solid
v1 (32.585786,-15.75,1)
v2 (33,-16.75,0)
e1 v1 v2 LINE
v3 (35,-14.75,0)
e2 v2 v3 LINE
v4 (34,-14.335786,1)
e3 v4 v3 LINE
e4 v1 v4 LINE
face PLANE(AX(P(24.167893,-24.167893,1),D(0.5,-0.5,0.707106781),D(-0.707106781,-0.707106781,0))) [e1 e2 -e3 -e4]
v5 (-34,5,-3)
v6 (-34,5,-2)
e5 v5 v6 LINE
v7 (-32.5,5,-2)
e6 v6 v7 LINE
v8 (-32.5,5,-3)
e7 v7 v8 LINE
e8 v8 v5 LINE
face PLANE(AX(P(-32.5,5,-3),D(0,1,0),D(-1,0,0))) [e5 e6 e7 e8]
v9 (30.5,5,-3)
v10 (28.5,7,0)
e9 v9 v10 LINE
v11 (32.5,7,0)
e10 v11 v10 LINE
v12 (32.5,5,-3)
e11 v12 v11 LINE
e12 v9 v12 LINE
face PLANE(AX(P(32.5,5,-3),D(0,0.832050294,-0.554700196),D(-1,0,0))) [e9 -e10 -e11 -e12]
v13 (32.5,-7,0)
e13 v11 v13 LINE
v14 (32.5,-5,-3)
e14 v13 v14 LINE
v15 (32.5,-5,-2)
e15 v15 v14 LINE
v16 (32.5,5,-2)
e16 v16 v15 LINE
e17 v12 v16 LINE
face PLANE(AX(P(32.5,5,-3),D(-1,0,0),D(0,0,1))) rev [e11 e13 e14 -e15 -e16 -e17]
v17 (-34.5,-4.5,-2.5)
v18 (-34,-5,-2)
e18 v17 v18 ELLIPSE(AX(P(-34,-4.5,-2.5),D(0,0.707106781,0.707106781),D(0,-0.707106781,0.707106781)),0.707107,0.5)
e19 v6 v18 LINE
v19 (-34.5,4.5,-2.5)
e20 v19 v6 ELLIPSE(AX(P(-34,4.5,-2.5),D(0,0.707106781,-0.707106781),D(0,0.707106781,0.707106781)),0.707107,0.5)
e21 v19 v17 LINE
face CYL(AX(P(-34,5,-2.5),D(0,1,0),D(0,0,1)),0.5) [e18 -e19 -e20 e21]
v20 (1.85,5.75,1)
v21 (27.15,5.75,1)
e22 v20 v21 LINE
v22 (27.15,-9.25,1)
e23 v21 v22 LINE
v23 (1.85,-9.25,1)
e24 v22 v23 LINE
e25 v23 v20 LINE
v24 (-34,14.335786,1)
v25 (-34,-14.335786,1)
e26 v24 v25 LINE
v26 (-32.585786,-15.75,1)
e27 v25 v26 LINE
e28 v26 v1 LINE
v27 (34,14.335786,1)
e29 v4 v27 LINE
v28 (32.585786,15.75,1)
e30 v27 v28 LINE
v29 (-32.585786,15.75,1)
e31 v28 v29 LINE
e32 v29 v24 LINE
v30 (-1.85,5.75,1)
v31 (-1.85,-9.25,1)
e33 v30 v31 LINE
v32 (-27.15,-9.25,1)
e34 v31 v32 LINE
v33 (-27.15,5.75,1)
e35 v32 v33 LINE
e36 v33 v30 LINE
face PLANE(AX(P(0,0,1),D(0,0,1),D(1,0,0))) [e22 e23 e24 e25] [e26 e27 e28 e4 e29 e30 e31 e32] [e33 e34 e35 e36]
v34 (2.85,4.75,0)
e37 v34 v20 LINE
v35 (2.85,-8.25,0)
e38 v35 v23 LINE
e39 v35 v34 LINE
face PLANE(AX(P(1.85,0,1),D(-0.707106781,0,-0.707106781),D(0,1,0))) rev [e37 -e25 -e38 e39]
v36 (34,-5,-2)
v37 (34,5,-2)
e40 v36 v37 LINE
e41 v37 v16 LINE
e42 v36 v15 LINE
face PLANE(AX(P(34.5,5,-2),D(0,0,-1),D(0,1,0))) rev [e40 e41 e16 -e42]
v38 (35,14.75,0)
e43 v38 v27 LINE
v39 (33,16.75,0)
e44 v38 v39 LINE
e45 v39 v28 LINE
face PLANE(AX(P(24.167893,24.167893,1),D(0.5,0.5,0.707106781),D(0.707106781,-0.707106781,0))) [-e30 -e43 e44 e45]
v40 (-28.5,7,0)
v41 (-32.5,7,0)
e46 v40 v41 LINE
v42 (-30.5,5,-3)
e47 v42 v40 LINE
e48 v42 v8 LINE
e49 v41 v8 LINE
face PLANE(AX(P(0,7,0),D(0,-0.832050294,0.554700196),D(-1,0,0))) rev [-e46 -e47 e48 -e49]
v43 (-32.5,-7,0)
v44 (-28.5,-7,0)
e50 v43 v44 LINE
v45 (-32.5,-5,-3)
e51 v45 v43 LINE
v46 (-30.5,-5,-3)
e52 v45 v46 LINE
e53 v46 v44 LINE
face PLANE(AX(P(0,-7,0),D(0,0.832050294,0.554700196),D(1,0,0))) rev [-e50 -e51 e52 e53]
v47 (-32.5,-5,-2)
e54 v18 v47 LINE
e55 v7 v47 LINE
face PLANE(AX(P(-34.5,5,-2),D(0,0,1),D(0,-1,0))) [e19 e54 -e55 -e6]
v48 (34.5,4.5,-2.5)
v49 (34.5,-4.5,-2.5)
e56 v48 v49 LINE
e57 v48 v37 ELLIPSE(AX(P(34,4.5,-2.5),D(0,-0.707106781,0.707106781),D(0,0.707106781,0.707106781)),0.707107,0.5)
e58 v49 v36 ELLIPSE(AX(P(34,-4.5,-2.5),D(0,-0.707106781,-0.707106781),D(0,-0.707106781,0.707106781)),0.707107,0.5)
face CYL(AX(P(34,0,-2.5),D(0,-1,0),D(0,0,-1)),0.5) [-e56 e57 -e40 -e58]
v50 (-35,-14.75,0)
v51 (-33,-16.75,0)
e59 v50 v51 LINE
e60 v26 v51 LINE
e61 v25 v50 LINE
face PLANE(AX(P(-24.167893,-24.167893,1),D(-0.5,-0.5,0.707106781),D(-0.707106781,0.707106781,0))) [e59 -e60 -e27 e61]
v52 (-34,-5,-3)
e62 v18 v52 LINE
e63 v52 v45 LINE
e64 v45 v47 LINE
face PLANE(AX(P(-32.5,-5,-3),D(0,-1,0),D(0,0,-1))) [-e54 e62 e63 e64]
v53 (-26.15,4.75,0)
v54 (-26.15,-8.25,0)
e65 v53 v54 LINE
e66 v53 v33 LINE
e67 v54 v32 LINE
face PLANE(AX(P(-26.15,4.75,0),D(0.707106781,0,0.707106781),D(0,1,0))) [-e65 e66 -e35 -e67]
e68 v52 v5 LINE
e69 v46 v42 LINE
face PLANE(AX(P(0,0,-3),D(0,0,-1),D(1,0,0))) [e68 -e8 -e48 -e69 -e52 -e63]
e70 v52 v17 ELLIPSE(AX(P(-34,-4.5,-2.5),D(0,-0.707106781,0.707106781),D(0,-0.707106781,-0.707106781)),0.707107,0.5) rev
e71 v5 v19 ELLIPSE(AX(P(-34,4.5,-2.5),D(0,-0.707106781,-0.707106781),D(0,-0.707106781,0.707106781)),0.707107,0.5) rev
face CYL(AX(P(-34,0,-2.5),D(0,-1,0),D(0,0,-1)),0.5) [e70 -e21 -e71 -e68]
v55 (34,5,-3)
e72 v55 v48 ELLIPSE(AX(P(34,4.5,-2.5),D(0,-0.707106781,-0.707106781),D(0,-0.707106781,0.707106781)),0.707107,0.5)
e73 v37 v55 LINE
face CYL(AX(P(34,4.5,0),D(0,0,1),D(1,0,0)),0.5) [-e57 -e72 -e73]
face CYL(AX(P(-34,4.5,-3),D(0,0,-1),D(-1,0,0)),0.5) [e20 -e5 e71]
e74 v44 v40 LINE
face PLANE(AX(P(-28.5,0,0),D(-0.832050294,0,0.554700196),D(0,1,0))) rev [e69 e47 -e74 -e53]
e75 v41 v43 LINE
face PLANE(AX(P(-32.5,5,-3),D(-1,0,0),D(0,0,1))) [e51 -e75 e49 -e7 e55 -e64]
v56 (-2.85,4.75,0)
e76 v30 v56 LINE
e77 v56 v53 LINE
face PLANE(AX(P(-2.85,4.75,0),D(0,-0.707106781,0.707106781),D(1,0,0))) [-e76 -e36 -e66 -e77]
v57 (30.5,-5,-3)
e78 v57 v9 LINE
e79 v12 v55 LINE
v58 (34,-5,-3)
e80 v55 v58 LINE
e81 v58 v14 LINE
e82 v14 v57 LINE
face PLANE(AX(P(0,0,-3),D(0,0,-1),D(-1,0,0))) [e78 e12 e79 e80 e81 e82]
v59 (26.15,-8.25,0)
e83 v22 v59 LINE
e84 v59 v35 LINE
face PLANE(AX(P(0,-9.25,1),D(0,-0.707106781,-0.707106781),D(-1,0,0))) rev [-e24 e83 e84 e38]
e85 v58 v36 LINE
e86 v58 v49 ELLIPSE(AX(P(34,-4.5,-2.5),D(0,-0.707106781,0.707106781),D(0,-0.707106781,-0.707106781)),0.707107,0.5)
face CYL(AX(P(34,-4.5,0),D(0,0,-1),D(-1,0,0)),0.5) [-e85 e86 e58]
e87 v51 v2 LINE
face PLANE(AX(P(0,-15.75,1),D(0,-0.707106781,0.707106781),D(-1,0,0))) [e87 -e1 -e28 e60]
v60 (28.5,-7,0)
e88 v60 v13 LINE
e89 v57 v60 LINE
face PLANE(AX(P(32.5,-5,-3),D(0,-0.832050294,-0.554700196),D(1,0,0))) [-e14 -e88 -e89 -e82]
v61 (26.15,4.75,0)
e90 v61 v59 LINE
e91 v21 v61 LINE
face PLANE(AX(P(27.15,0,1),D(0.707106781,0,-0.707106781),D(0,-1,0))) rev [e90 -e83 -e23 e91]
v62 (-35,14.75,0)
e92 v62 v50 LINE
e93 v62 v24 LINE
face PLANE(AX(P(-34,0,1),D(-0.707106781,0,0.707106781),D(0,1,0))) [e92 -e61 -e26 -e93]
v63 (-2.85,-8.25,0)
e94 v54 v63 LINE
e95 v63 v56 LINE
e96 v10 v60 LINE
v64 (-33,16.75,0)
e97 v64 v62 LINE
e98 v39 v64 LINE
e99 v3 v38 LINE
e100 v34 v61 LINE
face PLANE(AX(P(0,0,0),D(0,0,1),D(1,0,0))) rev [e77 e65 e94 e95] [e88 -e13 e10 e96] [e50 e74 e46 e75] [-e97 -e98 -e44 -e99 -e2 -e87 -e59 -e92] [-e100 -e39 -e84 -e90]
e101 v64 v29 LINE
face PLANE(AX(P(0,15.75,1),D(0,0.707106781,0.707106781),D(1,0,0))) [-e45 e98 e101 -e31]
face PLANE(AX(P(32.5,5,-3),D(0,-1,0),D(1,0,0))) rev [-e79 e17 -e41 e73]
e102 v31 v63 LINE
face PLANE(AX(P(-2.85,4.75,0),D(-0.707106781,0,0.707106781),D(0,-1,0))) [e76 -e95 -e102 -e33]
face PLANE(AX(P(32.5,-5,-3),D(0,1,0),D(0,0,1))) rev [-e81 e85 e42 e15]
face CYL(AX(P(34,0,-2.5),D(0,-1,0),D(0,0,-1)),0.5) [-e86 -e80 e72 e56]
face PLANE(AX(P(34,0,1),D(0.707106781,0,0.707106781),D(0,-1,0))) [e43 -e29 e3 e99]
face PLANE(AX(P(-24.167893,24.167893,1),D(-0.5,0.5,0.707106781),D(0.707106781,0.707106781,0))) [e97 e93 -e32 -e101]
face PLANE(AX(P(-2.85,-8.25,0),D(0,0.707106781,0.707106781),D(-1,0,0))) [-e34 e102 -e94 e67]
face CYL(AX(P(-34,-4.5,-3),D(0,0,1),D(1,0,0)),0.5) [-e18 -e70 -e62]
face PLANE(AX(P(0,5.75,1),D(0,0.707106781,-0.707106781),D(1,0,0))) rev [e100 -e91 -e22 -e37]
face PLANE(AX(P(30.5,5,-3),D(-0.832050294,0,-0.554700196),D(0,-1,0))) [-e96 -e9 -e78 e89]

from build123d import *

# Parameters (mm, degrees)
BOSS_EXTRUDE1_DEPTH      = 1
SKETCH2_W                = 23.3
SKETCH2_H                = 13
CUT_EXTRUDE1_DEPTH       = 3
CHAMFER1_SIZE            = 1
CHAMFER1_OF_MIRROR1_SIZE = 1
CHAMFER2_SIZE            = 1
SKETCH3_W                = 2
SKETCH3_H                = 10
BOSS_EXTRUDE2_DEPTH      = 3
SKETCH4_W                = 1
SKETCH4_H                = 10
BOSS_EXTRUDE3_DEPTH      = 2
FILLET1_R                = 0.5
FILLET1_OF_MIRROR2_R     = 0.5


with BuildPart() as part:
    # Sketch1 → Boss-Extrude1 (new body)
    with BuildSketch(Plane.XY):
        Polygon((-35, 14.75), (-35, -14.75), (-33, -16.75), (33, -16.75), (35, -14.75), (35, 14.75), (33, 16.75), (-33, 16.75), align=None)
    extrude(amount=BOSS_EXTRUDE1_DEPTH)

    # Sketch2 → Cut-Extrude1 (cut)
    with BuildSketch(Plane.XY.offset(1)):
        with Locations((-14.5, -1.75)):
            Rectangle(SKETCH2_W, SKETCH2_H)
    cut_extrude1 = extrude(amount=-CUT_EXTRUDE1_DEPTH, mode=Mode.SUBTRACT)

    # Chamfer1
    chamfer1_edges = [part.edges().sort_by_distance(p)[0] for p in [
        (-14.5, -8.25, 1),
        (-2.85, -1.75, 1),
        (-14.5, 4.75, 1),
        (-26.15, -1.75, 1),
    ]]
    chamfer(chamfer1_edges, length=CHAMFER1_SIZE - 0.0001)  # a hair under: the kernel refuses the full size

    # Mirror1: Cut-Extrude1 across plane
    add(cut_extrude1.mirror(Plane(origin=(0, 0, 0), x_dir=(0, 0, 1), z_dir=(1, 0, 0))), mode=Mode.SUBTRACT)

    # Chamfer1 of Mirror1
    chamfer1_of_mirror1_edges = [part.edges().sort_by_distance(p)[0] for p in [
        (14.5, -8.25, 1),
        (2.85, -1.75, 1),
        (14.5, 4.75, 1),
        (26.15, -1.75, 1),
    ]]
    chamfer(chamfer1_of_mirror1_edges, length=CHAMFER1_OF_MIRROR1_SIZE - 0.0001)  # a hair under: the kernel refuses the full size

    # Chamfer2
    chamfer2_edges = [part.edges().sort_by_distance(p)[0] for p in [
        (35, 0, 1),
        (34, 15.75, 1),
        (0, 16.75, 1),
        (-34, 15.75, 1),
        (-35, 0, 1),
        (34, -15.75, 1),
        (0, -16.75, 1),
        (-34, -15.75, 1),
    ]]
    chamfer(chamfer2_edges, length=CHAMFER2_SIZE - 0.0001)  # a hair under: the kernel refuses the full size

    # Sketch3 → Boss-Extrude2 (add)
    with BuildSketch(Plane(origin=(0, 0, 0), x_dir=(-1, 0, 0), z_dir=(0, 0, -1))):
        with Locations((-31.5, 0)):
            Rectangle(SKETCH3_W, SKETCH3_H)
    boss_extrude2 = extrude(amount=BOSS_EXTRUDE2_DEPTH)

    # Sketch4 → Boss-Extrude3 (add)
    with BuildSketch(Plane(origin=(32.5, 0, 0), x_dir=(0, 0, -1), z_dir=(1, 0, 0))):
        with Locations((2.5, 0)):
            Rectangle(SKETCH4_W, SKETCH4_H)
    boss_extrude3 = extrude(amount=BOSS_EXTRUDE3_DEPTH)

    # Fillet1
    fillet1_edges = [part.edges().sort_by_distance(p)[0] for p in [
        (34.5, 0, -3),
        (34.5, 5, -2.5),
        (34.5, 0, -2),
        (34.5, -5, -2.5),
    ]]
    fillet(fillet1_edges, radius=FILLET1_R - 0.0001)  # a hair under: the kernel refuses the full size

    # Mirror2: Boss-Extrude2, Boss-Extrude3 across plane
    add(boss_extrude2.mirror(Plane(origin=(0, 0, 0), x_dir=(0, 0, 1), z_dir=(1, 0, 0))))
    add(boss_extrude3.mirror(Plane(origin=(0, 0, 0), x_dir=(0, 0, 1), z_dir=(1, 0, 0))))

    # Fillet1 of Mirror2
    fillet1_of_mirror2_edges = [part.edges().sort_by_distance(p)[0] for p in [
        (-34.5, 0, -3),
        (-34.5, 5, -2.5),
        (-34.5, 0, -2),
        (-34.5, -5, -2.5),
    ]]
    fillet(fillet1_of_mirror2_edges, radius=FILLET1_OF_MIRROR2_R - 0.0001)  # a hair under: the kernel refuses the full size

    # Chamfer3: read off the stored shape, not the designer's step
    # Chamfer3: loft between two sections, ruled curve by curve
    chamfer3_from = [
        Edge.make_line((32.5, -5, -3), (30.5, -5, -3)),
        Edge.make_line((30.5, -5, -3), (30.5, 5, -3)),
        Edge.make_line((30.5, 5, -3), (32.5, 5, -3)),
        Edge.make_line((32.5, 5, -3), (32.5, -5, -3)),
    ]
    chamfer3_to = [
        Edge.make_line((32.5, -7, 0), (28.5, -7, 0)),
        Edge.make_line((28.5, -7, 0), (28.5, 7, 0)),
        Edge.make_line((28.5, 7, 0), (32.5, 7, 0)),
        Edge.make_line((32.5, 7, 0), (32.5, -7, 0)),
    ]
    chamfer3 = Solid(Shell([*[Face.make_surface_from_curves(chamfer3_from[k], chamfer3_to[k]) for k in range(4)], Face(Wire(chamfer3_from)), Face(Wire(chamfer3_to))]))
    add(chamfer3)

    # Chamfer4: read off the stored shape, not the designer's step
    # Chamfer4: loft between two sections, ruled curve by curve
    chamfer4_from = [
        Edge.make_line((-32.5, -5, -3), (-30.5, -5, -3)),
        Edge.make_line((-32.5, 5, -3), (-30.5, 5, -3)),
        Edge.make_line((-30.5, 5, -3), (-30.5, -5, -3)),
        Edge.make_line((-32.5, 5, -3), (-32.5, -5, -3)),
    ]
    chamfer4_to = [
        Edge.make_line((-32.5, -7, 0), (-28.5, -7, 0)),
        Edge.make_line((-32.5, 7, 0), (-28.5, 7, 0)),
        Edge.make_line((-28.5, 7, 0), (-28.5, -7, 0)),
        Edge.make_line((-32.5, 7, 0), (-32.5, -7, 0)),
    ]
    chamfer4 = Solid(Shell([*[Face.make_surface_from_curves(chamfer4_from[k], chamfer4_to[k]) for k in range(4)], Face(Wire(chamfer4_from)), Face(Wire(chamfer4_to))]))
    add(chamfer4)


solid = part.part
